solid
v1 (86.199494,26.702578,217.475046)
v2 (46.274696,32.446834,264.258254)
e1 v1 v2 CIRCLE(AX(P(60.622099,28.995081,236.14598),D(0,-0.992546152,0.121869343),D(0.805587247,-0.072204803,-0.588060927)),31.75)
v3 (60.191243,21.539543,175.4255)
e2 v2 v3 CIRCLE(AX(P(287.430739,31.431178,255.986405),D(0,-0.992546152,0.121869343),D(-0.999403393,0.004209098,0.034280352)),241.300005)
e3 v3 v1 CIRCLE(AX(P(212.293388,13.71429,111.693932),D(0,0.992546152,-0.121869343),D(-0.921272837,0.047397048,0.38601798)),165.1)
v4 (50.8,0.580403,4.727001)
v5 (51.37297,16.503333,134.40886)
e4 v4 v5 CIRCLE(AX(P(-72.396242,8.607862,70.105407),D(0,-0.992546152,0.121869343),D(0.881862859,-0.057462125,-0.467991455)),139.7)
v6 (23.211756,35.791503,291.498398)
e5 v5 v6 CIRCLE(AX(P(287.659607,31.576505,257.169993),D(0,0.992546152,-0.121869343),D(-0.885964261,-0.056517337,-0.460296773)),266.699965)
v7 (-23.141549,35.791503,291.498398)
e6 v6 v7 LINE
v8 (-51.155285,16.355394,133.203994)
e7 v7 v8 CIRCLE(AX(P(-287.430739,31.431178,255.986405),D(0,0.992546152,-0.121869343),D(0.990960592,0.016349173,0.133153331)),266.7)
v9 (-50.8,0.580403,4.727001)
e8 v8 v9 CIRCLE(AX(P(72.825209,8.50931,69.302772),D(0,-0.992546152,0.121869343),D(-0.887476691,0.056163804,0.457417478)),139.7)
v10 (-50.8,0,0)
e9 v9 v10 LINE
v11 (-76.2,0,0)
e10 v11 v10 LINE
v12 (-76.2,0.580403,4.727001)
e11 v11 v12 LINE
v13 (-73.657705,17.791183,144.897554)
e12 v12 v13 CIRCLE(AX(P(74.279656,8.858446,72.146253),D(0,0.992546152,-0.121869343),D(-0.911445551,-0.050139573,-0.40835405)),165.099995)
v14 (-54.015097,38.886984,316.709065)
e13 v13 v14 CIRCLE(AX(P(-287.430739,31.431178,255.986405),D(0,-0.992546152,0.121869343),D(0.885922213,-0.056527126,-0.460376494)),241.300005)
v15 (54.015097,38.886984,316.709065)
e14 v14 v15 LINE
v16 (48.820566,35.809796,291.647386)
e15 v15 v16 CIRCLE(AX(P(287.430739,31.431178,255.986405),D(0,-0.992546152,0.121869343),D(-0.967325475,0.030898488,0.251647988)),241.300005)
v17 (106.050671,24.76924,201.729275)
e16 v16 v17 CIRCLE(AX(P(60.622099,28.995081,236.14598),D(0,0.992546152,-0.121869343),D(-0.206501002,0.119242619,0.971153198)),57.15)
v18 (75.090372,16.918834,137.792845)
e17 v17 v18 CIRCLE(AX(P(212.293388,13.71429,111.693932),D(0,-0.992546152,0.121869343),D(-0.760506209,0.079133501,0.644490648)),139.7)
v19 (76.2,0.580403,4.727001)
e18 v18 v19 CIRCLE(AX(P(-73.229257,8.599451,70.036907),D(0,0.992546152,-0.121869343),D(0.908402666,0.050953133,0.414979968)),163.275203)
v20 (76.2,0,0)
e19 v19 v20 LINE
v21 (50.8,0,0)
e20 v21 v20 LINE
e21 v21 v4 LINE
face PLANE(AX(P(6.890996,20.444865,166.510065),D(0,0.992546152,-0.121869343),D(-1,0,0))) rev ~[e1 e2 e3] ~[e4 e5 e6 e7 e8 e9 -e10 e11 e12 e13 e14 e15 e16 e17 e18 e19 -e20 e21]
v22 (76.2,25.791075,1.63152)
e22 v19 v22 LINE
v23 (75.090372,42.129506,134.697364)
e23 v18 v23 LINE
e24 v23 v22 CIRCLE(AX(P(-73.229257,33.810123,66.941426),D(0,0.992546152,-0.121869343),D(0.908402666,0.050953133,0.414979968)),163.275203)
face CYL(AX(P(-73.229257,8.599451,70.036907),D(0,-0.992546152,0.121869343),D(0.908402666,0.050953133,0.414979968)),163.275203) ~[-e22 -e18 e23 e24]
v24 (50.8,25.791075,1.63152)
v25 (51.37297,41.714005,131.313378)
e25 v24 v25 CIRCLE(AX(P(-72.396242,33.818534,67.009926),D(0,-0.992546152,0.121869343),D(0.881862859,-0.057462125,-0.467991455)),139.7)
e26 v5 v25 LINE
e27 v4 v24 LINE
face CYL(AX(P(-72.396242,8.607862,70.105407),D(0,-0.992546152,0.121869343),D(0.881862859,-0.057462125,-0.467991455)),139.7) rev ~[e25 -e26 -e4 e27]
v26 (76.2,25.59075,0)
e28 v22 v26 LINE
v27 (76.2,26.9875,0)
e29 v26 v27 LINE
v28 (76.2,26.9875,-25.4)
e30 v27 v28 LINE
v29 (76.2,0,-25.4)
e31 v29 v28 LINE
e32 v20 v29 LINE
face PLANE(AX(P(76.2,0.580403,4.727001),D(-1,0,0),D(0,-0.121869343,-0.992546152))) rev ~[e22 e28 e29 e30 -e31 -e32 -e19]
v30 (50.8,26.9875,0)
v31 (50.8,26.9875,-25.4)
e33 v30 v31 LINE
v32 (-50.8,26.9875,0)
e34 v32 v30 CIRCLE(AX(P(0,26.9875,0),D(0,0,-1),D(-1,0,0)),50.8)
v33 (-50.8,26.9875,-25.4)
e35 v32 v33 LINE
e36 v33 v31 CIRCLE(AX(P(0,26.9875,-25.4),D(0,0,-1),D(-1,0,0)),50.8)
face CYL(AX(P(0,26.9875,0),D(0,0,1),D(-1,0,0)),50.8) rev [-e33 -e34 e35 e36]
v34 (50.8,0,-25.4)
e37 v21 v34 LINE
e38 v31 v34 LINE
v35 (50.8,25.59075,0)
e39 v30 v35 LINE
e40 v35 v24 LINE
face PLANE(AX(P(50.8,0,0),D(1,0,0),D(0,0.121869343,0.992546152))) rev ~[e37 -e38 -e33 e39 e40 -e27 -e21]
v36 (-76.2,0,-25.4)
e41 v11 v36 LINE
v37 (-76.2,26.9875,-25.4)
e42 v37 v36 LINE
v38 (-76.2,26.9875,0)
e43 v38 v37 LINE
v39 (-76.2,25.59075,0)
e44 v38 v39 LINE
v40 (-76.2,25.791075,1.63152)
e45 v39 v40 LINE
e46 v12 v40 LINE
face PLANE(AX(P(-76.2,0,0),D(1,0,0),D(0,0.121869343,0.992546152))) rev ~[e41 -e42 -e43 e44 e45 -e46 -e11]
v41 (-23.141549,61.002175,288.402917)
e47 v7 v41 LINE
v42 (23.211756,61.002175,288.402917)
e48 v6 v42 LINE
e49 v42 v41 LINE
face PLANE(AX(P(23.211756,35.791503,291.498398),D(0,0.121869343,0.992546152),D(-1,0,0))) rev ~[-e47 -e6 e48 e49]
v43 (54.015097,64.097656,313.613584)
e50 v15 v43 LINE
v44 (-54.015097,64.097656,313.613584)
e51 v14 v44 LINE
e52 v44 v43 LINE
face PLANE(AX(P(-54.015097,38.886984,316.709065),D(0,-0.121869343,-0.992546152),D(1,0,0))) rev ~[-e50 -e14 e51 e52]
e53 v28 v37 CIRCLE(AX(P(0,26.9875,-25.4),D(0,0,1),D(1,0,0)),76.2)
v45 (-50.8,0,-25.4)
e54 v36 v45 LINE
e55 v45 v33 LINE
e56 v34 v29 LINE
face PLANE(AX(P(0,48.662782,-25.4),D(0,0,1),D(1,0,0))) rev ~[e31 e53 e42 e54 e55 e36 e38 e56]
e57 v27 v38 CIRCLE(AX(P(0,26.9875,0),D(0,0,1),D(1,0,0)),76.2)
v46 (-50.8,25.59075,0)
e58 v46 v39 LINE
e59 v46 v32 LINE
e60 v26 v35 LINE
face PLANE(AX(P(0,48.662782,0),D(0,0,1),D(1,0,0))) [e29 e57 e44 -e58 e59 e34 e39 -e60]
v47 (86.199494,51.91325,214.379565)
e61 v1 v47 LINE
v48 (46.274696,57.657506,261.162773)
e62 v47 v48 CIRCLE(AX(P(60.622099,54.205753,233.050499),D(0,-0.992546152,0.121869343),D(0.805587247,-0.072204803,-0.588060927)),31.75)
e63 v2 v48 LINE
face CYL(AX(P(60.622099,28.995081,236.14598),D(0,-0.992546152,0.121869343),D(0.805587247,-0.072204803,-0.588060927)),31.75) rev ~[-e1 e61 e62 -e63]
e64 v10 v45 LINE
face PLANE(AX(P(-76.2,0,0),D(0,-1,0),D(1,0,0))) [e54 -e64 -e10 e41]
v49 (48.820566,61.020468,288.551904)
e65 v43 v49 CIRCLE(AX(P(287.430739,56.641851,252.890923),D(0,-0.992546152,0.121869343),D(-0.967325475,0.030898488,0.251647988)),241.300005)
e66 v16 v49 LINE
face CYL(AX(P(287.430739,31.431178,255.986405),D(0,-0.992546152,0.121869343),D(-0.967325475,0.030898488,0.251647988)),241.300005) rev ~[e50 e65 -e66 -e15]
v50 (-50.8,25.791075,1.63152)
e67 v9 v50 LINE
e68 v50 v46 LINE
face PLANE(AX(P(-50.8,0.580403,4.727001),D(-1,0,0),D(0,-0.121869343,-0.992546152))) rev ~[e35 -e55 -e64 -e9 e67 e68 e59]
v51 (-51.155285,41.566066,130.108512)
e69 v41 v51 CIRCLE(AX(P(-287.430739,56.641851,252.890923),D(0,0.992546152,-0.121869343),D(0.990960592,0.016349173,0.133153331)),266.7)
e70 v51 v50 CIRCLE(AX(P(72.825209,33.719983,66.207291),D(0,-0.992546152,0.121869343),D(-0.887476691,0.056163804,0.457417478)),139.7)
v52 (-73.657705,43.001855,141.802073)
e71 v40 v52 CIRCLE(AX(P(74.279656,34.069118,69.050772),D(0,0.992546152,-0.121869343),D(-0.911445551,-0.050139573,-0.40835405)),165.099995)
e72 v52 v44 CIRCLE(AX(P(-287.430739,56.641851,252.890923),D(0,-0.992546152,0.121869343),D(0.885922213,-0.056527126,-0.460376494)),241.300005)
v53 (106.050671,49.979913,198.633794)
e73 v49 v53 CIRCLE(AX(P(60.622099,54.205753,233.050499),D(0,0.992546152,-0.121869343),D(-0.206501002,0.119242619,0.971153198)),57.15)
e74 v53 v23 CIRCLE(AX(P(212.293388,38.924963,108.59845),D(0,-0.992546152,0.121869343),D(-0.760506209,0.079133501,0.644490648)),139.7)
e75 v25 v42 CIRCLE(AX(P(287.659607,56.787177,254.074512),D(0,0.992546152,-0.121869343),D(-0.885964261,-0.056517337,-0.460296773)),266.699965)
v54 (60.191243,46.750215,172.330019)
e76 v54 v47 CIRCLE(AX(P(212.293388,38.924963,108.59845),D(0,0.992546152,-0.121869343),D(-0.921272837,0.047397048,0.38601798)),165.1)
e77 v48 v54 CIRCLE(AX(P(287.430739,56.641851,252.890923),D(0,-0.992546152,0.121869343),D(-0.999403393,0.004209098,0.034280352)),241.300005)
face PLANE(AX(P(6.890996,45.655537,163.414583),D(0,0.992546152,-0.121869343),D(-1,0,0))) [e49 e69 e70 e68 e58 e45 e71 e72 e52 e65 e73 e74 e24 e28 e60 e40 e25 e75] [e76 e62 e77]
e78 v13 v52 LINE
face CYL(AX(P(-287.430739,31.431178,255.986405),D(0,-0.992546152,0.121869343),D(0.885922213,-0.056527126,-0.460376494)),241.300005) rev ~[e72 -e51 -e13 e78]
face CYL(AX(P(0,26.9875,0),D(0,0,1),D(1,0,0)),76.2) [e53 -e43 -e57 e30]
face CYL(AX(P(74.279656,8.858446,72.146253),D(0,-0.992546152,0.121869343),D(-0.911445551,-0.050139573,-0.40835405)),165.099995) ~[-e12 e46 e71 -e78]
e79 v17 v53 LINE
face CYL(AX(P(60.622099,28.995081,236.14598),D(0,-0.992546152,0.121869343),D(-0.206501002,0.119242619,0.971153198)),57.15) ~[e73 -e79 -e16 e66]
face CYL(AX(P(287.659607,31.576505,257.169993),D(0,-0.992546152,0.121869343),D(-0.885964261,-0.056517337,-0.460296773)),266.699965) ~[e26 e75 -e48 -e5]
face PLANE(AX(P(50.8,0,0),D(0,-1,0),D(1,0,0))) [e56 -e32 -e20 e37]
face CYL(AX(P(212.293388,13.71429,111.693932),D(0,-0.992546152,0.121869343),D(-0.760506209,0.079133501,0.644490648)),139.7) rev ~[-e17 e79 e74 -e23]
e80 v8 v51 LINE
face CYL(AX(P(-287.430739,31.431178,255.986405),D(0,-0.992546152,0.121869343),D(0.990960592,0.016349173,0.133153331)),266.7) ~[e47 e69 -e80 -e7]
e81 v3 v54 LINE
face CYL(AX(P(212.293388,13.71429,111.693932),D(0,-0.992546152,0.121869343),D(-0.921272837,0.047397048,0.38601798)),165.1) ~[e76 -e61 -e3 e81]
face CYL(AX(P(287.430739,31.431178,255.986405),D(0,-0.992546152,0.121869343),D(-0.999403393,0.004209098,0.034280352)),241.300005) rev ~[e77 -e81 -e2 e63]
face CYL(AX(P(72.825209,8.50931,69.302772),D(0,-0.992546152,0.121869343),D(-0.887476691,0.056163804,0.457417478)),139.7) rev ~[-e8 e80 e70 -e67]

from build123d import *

# Parameters (mm, degrees)
F4_DEPTH = 25.4
F6_DEPTH = 25.4


# Not quite as in the source:
# - ends of sketch curves that miss each other by under 0.0002 mm in the source are joined


with BuildPart() as f4:
    # F3 (on offset) → F4 (new body)
    with BuildSketch(Plane.XY):
        with BuildLine():
            Line((-76.2, 26.9875), (-76.2, 0))
            Line((-76.2, 0), (-50.8, 0))
            Line((-50.8, 0), (-50.8, 26.9875))
            ThreePointArc((-50.8, 26.9875), (0, 77.7875), (50.8, 26.9875))
            Line((50.8, 26.9875), (50.8, 0))
            Line((50.8, 0), (76.2, 0))
            Line((76.2, 0), (76.2, 26.9875))
            ThreePointArc((76.2, 26.9875), (0, 103.1875), (-76.2, 26.9875))
        make_face()
    extrude(amount=-F4_DEPTH)

    # F5 (on line) → F6 (join)
    with BuildSketch(Plane(origin=(0, 0, 0), x_dir=(-1, 0, 0), z_dir=(0, 0.9925461516, -0.1218693434))):
        with BuildLine():
            ThreePointArc((-75.0903723478, 138.827645489), (-90.0403532632, 71.9142183688), (-76.2, 4.7625))
            Line((-76.2, 4.7625), (-76.2, 0))
            Line((-76.2, 0), (-50.8, 0))
            Line((-50.8, 0), (-50.8, 4.7625))
            ThreePointArc((-50.8, 4.7625), (-67.302415347, 70.0192610552), (-51.3729695475, 135.4182467678))
            ThreePointArc((-51.3729695475, 135.4182467678), (-25.0838158912, 212.3805783338), (-23.2117561056, 293.6875002493))
            Line((-23.2117561056, 293.6875002493), (0, 293.6875002493))
            Line((0, 293.6875002493), (23.1415493167, 293.6875002493))
            ThreePointArc((23.1415493167, 293.6875002493), (24.7523028396, 211.7684987185), (51.1552849917, 134.2043325579))
            ThreePointArc((51.1552849917, 134.2043325579), (66.8742650231, 69.439784083), (50.8, 4.7625))
            Line((50.8, 4.7625), (50.8, 0))
            Line((50.8, 0), (76.2, 0))
            Line((76.2, 0), (76.2, 4.7625))
            ThreePointArc((76.2, 4.7625), (90.7935935425, 75.6597014149), (73.6577047551, 145.9857098073))
            ThreePointArc((73.6577047551, 145.9857098073), (47.6694306232, 230.702066542), (54.0150973414, 319.0874952316))
            Line((54.0150973414, 319.0874952316), (0, 319.0874952316))
            Line((0, 319.0874952316), (-54.0150973414, 319.0874952316))
            ThreePointArc((-54.0150973414, 319.0874952316), (-51.0804025225, 306.5319685143), (-48.8205663921, 293.8376065574))
            ThreePointArc((-48.8205663921, 293.8376065574), (-108.938602772, 268.4421399471), (-106.0506710111, 203.2442268465))
            ThreePointArc((-106.0506710111, 203.2442268465), (-86.3813942483, 173.049340693), (-75.0903723478, 138.827645489))
        make_face()
        with BuildLine():
            ThreePointArc((-46.2746955842, 266.2427872527), (-48.9959426673, 220.834025793), (-60.1912430767, 176.7429149913))
            ThreePointArc((-60.1912430767, 176.7429149913), (-71.5917023099, 198.9100774911), (-86.1994937771, 219.1082455385))
            ThreePointArc((-86.1994937771, 219.1082455385), (-84.8490348444, 258.4405568096), (-46.2746955842, 266.2427872527))
        make_face(mode=Mode.SUBTRACT)
    extrude(amount=F6_DEPTH)


solid = f4.part
